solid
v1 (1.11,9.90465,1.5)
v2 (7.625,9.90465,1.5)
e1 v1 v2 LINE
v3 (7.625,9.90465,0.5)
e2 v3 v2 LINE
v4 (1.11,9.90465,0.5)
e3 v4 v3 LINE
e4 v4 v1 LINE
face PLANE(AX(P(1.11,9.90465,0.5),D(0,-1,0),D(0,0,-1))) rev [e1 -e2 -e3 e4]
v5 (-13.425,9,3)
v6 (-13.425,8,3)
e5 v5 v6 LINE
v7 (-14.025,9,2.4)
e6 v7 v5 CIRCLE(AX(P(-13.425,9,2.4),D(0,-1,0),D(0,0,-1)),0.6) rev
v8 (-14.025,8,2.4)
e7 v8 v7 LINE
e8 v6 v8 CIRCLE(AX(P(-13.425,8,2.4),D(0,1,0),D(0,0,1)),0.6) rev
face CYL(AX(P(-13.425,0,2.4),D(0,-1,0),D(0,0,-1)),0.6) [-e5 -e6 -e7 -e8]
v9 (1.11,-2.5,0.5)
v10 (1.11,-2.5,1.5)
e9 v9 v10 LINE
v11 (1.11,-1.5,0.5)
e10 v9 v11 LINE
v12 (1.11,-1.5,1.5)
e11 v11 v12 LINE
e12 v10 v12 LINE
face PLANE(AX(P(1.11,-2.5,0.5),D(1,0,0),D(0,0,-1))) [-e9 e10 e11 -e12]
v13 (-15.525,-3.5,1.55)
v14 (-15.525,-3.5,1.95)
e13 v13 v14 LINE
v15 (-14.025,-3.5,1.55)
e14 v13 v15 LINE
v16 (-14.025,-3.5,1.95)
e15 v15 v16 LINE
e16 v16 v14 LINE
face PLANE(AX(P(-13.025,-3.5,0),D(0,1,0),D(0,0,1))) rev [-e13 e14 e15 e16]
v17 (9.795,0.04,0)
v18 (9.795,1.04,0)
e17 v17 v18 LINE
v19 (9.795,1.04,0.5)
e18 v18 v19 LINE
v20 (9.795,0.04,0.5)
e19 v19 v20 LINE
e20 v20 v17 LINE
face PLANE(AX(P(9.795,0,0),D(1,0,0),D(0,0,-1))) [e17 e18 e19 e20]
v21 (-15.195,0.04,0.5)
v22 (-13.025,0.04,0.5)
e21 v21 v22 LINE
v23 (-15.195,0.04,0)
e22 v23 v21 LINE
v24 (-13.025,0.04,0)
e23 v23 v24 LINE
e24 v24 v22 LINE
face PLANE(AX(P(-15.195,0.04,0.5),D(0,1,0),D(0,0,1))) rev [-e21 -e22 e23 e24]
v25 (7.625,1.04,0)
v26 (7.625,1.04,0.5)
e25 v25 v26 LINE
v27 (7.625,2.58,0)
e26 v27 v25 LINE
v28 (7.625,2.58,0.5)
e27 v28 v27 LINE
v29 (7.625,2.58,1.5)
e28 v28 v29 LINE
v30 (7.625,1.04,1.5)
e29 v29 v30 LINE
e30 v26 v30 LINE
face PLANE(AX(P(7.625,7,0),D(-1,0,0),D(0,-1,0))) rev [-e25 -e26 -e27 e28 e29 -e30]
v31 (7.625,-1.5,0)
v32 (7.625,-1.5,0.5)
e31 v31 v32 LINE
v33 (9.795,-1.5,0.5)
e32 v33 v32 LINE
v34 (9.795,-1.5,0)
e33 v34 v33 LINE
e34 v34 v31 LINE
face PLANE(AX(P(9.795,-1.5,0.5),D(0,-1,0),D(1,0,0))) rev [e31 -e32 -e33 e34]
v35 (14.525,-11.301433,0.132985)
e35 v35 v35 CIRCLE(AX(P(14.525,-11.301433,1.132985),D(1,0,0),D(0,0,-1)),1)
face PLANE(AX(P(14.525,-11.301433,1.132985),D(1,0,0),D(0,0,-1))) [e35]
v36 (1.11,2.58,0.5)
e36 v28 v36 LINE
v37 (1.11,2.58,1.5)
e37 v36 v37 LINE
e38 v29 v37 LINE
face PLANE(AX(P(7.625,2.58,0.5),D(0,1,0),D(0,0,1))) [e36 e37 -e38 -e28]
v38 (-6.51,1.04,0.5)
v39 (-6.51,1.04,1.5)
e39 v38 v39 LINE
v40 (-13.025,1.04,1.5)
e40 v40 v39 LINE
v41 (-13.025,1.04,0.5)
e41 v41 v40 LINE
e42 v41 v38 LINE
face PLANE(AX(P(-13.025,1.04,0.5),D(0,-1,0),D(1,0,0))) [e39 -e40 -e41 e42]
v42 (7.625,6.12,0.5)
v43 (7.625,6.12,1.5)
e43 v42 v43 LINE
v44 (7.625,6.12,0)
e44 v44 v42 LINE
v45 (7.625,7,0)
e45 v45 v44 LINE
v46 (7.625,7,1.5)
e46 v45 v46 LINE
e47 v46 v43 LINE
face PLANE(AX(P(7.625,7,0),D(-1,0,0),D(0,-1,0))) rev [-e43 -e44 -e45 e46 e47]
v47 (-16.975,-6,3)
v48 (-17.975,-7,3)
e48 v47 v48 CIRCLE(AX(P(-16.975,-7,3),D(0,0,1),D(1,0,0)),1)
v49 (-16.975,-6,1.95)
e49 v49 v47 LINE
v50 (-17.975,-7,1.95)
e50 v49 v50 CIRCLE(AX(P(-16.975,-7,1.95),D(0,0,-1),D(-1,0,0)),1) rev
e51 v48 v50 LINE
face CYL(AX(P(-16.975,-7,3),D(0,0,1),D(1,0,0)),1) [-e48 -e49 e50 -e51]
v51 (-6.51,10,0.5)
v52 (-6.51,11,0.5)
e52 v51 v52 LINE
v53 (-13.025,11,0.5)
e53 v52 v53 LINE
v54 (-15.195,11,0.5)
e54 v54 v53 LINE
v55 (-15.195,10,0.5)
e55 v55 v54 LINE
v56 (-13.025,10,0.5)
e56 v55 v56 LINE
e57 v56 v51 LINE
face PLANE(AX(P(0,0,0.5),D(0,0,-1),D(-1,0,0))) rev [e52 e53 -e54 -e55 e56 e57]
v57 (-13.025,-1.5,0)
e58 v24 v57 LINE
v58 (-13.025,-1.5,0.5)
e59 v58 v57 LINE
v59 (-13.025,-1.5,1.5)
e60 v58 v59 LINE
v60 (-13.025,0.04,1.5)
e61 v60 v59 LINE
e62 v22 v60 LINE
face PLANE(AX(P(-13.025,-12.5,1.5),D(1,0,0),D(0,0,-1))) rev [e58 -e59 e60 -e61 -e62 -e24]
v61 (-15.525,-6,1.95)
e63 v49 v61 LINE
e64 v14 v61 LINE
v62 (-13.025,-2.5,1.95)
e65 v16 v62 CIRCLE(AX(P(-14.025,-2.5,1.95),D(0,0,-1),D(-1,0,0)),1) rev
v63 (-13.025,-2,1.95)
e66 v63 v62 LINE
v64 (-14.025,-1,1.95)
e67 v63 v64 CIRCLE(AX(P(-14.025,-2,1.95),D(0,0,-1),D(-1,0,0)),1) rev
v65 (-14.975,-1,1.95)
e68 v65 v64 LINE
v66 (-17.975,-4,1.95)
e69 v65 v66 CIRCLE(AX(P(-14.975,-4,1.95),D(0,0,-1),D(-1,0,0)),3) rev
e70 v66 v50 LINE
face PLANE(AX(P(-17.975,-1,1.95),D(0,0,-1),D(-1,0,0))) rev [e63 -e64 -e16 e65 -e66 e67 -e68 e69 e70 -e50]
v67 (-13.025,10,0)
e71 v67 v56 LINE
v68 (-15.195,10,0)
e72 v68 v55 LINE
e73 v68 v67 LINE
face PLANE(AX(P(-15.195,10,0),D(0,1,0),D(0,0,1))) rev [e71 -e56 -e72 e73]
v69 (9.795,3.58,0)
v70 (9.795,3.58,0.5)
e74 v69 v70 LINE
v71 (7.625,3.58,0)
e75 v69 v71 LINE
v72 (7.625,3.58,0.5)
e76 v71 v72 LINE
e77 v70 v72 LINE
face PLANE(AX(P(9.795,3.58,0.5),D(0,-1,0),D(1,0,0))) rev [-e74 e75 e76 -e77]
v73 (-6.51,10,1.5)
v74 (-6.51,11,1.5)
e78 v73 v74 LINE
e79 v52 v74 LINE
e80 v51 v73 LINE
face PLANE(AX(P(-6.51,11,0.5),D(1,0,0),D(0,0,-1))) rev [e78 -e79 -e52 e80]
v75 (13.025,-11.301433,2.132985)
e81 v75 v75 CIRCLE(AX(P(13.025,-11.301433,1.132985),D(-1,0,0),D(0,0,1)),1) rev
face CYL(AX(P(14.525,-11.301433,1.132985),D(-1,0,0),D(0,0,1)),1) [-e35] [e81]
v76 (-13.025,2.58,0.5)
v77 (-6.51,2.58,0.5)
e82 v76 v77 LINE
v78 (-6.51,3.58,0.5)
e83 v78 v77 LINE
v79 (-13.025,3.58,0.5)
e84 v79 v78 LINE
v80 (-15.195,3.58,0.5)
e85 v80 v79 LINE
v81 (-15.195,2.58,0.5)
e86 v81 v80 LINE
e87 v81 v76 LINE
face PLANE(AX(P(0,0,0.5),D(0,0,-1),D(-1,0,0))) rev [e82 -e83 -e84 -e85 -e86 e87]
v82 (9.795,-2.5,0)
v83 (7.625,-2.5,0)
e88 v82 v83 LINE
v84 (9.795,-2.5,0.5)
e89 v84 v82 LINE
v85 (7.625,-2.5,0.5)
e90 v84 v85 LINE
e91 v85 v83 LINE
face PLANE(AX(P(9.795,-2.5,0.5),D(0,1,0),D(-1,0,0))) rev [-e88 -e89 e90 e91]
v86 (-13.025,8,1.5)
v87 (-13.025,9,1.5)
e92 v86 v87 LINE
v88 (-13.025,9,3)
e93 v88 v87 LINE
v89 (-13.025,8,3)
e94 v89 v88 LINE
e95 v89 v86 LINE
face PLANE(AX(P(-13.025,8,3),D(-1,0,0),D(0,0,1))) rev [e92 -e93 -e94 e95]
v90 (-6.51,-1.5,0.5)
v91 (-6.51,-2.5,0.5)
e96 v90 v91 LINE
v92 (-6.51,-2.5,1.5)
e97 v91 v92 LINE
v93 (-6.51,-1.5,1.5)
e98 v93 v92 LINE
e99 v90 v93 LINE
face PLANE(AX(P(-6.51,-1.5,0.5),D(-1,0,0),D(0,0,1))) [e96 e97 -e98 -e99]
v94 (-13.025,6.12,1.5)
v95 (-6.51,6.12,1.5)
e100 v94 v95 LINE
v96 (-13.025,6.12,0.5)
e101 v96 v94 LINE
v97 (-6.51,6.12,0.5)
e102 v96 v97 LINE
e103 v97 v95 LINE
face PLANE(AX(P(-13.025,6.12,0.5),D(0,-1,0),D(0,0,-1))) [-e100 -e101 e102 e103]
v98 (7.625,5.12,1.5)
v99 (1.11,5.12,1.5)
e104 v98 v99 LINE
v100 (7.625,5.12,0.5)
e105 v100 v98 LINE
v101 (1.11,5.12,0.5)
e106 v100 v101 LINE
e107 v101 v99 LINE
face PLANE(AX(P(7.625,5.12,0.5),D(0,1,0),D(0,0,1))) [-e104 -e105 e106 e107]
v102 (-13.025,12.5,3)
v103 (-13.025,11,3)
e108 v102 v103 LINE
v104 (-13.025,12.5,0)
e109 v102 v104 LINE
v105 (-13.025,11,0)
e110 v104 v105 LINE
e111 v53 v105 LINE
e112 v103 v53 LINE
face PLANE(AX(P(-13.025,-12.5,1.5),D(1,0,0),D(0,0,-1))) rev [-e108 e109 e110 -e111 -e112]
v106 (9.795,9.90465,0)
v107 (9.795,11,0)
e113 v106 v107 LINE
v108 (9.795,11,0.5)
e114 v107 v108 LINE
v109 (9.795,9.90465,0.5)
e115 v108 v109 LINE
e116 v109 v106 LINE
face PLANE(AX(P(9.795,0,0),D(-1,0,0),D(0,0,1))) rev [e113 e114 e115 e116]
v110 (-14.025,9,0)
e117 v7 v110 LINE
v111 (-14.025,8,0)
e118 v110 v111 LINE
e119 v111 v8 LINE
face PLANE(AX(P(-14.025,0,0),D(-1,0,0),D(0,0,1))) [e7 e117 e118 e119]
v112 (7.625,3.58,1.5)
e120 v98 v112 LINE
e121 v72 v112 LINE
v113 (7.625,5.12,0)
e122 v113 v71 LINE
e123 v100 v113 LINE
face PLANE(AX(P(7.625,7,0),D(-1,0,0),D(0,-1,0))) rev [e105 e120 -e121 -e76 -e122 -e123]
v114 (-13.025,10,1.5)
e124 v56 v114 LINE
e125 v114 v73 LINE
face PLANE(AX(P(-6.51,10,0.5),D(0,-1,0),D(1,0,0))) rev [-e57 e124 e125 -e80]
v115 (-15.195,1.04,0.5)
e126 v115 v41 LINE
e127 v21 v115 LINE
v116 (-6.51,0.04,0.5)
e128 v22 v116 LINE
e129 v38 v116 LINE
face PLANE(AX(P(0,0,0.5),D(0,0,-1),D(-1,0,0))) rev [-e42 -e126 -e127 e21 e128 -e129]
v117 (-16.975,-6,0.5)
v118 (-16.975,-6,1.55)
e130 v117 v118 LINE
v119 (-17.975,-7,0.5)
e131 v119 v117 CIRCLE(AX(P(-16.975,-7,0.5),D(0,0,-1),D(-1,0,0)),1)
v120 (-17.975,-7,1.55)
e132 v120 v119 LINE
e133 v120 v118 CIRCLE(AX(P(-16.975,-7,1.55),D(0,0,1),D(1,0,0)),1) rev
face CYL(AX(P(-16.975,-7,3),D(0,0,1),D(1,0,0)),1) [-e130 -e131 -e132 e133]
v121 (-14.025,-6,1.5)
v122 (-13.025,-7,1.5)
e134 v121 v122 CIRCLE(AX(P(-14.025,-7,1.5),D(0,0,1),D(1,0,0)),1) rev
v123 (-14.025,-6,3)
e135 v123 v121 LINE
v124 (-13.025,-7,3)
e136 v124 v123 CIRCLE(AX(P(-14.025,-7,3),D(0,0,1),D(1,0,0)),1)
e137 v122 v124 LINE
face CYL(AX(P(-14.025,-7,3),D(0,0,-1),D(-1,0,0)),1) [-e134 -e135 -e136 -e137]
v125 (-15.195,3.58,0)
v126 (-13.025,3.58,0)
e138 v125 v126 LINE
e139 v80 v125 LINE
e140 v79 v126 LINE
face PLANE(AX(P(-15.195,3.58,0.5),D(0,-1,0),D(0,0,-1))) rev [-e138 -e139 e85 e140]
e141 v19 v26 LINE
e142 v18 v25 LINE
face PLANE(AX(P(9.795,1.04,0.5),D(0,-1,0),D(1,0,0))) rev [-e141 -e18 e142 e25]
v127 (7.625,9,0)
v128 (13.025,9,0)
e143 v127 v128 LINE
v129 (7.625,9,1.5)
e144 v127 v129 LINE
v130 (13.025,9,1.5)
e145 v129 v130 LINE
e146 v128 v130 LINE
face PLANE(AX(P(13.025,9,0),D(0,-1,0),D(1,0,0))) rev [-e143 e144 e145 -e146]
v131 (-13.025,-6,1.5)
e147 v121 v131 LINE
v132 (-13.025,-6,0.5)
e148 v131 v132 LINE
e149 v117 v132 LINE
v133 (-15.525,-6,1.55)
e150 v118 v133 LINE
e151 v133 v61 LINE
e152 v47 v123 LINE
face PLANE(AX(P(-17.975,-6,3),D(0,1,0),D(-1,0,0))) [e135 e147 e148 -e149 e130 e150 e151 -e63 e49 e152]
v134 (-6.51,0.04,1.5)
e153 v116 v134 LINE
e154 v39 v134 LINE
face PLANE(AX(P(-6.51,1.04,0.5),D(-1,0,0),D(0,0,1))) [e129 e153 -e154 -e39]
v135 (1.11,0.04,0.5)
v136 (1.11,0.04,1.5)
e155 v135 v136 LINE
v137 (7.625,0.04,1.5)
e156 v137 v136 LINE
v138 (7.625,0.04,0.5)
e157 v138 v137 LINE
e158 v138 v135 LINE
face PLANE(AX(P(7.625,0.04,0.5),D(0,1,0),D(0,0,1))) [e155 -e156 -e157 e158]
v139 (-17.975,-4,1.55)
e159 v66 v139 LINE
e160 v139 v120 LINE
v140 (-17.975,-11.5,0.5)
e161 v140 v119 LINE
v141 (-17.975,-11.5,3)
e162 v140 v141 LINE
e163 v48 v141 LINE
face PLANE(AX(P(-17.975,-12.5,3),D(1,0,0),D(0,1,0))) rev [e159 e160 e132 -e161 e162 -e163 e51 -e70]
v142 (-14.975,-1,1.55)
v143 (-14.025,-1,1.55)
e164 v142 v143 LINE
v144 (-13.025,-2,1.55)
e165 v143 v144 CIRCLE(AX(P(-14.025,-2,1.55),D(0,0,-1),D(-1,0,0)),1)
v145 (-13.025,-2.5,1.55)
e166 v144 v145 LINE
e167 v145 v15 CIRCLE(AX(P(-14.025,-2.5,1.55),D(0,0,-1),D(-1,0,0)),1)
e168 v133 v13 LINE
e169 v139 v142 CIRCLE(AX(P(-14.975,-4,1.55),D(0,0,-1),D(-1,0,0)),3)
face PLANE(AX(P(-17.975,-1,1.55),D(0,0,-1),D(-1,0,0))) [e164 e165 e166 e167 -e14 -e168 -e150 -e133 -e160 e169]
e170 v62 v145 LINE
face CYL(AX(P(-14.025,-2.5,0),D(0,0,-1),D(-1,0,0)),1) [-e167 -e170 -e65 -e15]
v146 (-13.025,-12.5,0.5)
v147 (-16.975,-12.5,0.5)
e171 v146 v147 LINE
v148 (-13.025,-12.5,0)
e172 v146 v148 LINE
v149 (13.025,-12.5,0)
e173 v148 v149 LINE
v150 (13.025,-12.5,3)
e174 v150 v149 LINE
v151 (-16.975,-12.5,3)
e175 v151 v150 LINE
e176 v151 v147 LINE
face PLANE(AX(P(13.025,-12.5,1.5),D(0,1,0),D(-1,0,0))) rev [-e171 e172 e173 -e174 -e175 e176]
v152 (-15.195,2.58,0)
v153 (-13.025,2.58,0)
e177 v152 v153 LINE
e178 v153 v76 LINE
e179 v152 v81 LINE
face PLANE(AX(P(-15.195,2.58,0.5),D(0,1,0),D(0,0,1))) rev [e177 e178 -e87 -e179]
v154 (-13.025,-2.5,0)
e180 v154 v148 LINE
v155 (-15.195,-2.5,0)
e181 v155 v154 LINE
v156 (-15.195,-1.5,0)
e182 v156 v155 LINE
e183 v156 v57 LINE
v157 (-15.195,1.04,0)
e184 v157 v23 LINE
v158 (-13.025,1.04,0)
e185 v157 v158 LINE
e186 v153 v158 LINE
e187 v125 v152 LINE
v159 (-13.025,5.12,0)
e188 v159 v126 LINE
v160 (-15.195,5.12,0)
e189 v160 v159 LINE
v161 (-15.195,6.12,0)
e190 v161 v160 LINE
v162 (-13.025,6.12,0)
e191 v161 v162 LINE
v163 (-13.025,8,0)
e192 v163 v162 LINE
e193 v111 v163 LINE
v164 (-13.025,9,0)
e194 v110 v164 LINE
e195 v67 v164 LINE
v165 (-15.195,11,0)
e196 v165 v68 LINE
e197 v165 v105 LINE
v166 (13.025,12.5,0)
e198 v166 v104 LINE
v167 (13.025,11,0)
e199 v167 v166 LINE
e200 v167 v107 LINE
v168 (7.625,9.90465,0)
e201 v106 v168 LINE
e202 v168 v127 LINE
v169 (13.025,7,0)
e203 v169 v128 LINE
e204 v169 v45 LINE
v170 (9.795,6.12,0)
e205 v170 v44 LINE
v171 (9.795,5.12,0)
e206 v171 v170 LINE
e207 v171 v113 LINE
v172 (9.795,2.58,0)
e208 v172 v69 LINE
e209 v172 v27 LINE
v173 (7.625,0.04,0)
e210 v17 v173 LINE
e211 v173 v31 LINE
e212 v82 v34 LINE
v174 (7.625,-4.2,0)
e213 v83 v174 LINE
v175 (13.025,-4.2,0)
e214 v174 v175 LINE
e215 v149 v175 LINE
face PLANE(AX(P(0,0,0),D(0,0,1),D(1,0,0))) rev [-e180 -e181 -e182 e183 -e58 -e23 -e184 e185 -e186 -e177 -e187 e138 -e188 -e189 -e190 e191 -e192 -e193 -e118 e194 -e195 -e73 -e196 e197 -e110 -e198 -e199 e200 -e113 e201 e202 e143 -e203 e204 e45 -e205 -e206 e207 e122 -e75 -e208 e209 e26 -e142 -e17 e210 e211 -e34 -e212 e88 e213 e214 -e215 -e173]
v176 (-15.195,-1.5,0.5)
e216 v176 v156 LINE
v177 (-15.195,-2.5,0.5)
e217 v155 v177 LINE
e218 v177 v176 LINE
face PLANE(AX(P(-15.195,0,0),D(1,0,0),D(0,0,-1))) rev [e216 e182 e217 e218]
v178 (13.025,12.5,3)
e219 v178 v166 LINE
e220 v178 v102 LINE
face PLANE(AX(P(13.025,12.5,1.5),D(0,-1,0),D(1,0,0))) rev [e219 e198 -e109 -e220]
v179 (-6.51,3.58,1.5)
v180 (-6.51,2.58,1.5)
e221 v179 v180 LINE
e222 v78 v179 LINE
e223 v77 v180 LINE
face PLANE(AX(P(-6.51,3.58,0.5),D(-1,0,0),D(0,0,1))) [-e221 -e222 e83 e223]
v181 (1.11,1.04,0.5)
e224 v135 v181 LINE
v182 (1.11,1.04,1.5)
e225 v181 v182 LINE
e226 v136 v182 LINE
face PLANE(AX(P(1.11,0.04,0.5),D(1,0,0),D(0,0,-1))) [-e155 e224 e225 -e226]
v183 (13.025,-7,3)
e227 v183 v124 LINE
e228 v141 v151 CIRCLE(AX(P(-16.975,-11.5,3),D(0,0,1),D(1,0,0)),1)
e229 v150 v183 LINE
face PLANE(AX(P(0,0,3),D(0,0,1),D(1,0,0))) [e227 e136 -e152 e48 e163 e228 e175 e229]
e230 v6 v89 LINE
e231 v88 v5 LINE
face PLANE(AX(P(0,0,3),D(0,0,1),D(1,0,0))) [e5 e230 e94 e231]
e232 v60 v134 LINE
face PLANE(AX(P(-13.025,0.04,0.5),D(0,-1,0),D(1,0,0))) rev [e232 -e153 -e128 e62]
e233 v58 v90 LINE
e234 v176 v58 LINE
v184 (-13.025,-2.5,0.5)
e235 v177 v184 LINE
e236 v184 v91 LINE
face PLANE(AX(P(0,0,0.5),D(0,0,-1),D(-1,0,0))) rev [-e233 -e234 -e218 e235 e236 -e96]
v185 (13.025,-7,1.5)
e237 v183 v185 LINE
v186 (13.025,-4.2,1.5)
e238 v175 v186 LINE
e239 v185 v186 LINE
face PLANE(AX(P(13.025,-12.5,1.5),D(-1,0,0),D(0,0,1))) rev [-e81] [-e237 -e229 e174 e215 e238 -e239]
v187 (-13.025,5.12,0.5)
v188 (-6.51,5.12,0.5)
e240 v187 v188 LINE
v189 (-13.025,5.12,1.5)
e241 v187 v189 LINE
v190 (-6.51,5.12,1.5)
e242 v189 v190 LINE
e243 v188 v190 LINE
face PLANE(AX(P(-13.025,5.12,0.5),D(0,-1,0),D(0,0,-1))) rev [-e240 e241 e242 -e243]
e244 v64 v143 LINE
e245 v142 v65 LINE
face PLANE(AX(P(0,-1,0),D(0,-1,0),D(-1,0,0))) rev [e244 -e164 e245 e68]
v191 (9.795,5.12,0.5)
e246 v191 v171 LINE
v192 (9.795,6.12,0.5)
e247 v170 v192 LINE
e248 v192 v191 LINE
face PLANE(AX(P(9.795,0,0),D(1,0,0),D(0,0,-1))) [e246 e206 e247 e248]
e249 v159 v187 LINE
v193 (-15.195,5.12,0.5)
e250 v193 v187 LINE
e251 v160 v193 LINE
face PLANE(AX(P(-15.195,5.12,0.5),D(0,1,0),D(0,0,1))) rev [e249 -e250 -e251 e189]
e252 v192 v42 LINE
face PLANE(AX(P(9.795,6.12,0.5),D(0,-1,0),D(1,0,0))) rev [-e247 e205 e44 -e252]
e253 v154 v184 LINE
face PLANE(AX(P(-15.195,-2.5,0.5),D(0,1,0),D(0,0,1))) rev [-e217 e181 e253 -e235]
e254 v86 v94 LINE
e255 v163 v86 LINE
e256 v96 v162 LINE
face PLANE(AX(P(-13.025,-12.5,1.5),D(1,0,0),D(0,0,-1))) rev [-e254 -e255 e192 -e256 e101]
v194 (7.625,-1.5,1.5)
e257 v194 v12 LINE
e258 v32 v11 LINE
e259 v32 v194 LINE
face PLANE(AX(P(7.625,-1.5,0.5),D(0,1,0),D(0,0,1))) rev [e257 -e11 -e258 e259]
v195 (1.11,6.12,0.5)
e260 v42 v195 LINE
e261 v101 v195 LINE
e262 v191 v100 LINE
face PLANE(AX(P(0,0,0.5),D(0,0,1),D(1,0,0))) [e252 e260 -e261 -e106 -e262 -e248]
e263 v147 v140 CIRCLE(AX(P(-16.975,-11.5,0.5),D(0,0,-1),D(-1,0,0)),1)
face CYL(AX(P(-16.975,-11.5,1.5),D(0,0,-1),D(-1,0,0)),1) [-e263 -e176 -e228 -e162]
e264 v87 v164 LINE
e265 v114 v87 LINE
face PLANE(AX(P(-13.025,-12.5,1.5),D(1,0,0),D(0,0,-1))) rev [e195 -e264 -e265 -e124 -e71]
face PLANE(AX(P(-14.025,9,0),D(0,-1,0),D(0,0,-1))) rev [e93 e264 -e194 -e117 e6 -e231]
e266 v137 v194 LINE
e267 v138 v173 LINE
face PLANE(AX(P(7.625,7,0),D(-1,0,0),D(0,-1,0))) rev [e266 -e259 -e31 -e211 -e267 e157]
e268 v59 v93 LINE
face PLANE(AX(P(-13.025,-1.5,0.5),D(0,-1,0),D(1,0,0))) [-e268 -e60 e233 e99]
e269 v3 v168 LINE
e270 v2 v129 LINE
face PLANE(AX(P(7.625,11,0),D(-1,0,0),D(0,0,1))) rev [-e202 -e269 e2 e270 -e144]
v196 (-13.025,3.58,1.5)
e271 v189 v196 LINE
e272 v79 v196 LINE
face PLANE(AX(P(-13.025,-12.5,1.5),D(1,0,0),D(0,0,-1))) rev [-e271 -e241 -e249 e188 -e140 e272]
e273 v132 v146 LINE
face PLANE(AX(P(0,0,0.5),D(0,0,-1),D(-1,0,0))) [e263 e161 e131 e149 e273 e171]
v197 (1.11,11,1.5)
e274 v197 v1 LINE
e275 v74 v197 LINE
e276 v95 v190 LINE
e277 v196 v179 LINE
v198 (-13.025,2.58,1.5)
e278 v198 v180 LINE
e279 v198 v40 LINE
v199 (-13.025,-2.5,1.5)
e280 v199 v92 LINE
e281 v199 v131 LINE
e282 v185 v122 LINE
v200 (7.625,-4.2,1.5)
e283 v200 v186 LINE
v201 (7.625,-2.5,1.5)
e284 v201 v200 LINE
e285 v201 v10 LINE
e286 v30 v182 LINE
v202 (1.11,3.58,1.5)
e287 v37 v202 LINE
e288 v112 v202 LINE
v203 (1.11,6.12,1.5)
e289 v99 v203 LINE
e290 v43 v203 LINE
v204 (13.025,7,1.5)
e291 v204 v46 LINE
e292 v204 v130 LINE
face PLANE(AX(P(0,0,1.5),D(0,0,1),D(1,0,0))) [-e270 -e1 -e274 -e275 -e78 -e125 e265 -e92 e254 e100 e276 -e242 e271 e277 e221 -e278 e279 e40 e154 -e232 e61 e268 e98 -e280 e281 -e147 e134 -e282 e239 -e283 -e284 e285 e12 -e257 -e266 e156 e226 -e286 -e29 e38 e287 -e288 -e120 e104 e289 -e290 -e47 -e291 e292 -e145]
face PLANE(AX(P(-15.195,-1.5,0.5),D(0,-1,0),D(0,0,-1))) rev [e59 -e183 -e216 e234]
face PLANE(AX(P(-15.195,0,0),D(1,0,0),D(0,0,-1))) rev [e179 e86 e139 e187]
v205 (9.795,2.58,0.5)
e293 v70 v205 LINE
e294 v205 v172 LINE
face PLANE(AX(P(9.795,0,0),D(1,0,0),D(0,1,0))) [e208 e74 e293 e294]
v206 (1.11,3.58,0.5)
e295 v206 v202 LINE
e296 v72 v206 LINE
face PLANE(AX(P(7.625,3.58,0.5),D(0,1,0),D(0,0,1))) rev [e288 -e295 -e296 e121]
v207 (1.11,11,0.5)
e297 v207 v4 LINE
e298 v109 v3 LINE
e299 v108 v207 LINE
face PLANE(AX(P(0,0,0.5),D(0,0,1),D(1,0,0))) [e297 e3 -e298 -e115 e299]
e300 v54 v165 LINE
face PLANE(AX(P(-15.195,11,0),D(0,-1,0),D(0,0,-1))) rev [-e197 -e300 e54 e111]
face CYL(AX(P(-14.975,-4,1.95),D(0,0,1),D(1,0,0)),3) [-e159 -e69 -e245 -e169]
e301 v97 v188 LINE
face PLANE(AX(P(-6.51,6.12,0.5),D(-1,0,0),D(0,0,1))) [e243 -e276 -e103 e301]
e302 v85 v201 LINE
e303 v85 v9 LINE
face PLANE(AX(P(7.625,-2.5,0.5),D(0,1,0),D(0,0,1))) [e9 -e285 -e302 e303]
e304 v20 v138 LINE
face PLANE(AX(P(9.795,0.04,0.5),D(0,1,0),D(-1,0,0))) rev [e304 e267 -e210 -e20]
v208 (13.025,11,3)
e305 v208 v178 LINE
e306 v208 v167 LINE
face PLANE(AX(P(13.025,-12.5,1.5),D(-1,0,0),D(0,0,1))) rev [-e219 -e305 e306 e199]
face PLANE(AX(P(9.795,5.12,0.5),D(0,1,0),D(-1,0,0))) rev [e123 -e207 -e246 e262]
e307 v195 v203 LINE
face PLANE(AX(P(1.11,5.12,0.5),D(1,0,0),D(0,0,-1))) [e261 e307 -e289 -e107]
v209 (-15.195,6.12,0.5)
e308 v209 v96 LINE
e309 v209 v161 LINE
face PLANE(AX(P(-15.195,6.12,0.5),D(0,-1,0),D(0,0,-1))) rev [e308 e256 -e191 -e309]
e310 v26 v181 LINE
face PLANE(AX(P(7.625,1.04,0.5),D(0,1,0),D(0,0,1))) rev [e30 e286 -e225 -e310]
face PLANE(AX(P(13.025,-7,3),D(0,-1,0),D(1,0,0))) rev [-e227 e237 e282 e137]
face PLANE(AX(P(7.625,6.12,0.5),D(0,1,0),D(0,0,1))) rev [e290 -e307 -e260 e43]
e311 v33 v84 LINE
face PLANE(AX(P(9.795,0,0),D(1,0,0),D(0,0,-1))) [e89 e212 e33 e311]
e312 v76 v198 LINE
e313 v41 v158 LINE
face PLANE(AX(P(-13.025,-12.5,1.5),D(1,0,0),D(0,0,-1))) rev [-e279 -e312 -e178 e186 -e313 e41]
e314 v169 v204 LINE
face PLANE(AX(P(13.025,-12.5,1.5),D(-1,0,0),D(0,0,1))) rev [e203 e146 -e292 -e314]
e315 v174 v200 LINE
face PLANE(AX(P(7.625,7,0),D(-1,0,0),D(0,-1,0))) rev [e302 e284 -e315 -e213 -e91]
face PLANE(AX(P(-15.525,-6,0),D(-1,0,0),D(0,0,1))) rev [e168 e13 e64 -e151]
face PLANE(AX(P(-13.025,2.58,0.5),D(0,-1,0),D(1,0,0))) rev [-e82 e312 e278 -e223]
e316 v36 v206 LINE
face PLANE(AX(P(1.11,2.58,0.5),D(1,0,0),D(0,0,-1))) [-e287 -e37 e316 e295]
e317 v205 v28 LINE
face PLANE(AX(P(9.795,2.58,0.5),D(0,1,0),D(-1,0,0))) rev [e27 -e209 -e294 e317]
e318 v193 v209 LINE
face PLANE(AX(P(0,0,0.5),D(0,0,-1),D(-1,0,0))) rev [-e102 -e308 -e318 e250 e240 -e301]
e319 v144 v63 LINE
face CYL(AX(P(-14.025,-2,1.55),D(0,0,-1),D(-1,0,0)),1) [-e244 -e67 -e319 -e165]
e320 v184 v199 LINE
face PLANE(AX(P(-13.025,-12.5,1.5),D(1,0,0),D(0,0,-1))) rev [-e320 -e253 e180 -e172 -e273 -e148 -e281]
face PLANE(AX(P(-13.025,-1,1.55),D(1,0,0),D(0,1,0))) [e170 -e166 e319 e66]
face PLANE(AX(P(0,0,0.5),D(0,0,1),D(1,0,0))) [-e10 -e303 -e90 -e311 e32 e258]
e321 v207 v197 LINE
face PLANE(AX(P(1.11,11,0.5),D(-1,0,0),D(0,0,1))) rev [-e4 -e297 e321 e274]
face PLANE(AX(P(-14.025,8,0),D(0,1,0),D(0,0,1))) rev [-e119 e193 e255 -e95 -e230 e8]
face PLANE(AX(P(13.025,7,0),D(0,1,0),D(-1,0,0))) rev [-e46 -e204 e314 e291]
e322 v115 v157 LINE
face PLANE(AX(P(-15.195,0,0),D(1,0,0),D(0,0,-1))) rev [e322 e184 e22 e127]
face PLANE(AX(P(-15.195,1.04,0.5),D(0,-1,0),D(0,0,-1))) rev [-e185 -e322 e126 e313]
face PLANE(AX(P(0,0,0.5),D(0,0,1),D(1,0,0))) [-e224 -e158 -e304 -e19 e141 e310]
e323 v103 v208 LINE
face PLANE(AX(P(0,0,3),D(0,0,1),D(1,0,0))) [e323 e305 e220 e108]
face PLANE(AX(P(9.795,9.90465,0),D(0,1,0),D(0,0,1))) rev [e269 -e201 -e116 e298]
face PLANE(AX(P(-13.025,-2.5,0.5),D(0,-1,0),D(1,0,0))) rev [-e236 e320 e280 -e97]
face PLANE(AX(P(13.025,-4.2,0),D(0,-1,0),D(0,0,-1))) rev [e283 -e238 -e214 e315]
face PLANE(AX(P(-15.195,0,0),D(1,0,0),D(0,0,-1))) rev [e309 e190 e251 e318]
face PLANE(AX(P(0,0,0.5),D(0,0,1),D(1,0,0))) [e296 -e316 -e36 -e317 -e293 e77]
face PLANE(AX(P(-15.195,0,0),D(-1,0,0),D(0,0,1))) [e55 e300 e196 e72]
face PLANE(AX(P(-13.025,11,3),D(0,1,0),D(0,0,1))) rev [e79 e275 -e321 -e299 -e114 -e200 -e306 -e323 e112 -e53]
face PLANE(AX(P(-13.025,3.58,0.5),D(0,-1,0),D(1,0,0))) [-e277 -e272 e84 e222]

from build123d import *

# Parameters (mm, degrees)
SKETCH_1_W            = 26.05
SKETCH_1_H            = 25
EXTRUDE_1_DEPTH       = 1.5
SKETCH_3_W            = 5.4
SKETCH_3_H            = 11.2
CUT_EXTRUDE_1_DEPTH   = 19.114928236
SKETCH_4_W            = 26.05
SKETCH_4_H            = 1.5
EXTRUDE_2_DEPTH       = 1.5
SKETCH_5_W            = 5.4
SKETCH_5_H            = 2
CUT_EXTRUDE_2_DEPTH   = 19.114928236
SKETCH_6_W            = 31
SKETCH_6_H            = 5.5
EXTRUDE_3_DEPTH       = 1.5
SKETCH_7_R            = 1
EXTRUDE_4_DEPTH       = 1.5
EXTRUDE_13_DEPTH      = 1
EXTRUDE_13_DEPTH_BACK = 1.5
SKETCH_10_W           = 4.95
SKETCH_10_H           = 6.5
FILLET_1_R            = 1
SKETCH_11_W           = 4.95
SKETCH_11_H           = 0.4
EXTRUDE_1_2_DEPTH     = 5
SKETCH_12_W           = 2.5
SKETCH_12_H           = 2.5
CUT_EXTRUDE_3_DEPTH   = 22.980744414
FILLET_2_R            = 3
FILLET_3_R            = 1
SKETCH_13_W           = 1
SKETCH_13_H           = 0.4
EXTRUDE_14_DEPTH      = 4
SKETCH_15_W           = 1.5
SKETCH_15_H           = 1
EXTRUDE_15_DEPTH      = 1
SKETCH_16_W           = 1
SKETCH_16_H           = 1
EXTRUDE_16_DEPTH      = 1.5
SKETCH_17_W           = 6.515
SKETCH_17_H           = 1
CUT_EXTRUDE_1_2_DEPTH = 1
SKETCH_18_W           = 0.5
SKETCH_18_H           = 1
EXTRUDE_17_DEPTH      = 2.17
SKETCH_20_W           = 0.5
SKETCH_20_H           = 1
EXTRUDE_18_DEPTH      = 2.17
SKETCH_21_W           = 6.515
SKETCH_21_H           = 1
SKETCH_21_H_2         = 1.095349757
CUT_EXTRUDE_4_DEPTH   = 1
SKETCH_22_W           = 0.5
SKETCH_22_H           = 1
EXTRUDE_19_DEPTH      = 2.17
SKETCH_23_W           = 0.5
SKETCH_23_H           = 1.095349757
EXTRUDE_20_DEPTH      = 2.17
FILLET_4_R            = 0.6


with BuildPart() as part:
    # Эскиз1 → Extrude 1 (new body)
    with BuildSketch(Plane.XY):
        Rectangle(SKETCH_1_W, SKETCH_1_H)
    extrude(amount=EXTRUDE_1_DEPTH)

    # Эскиз3 → Cut-Extrude 1 (cut, through all)
    with BuildSketch(Plane.XY.offset(1.5)):
        with Locations((10.325, 1.4)):
            Rectangle(SKETCH_3_W, SKETCH_3_H)
    extrude(amount=-CUT_EXTRUDE_1_DEPTH, mode=Mode.SUBTRACT)

    # Эскиз4 → Бобышка-Вытянуть2 (add)
    with BuildSketch(Plane.XY.offset(1.5)):
        with Locations((0, 11.75)):
            Rectangle(SKETCH_4_W, SKETCH_4_H)
    extrude(amount=EXTRUDE_2_DEPTH)

    # Эскиз5 → Вырез-Вытянуть2 (cut, through all)
    with BuildSketch(Plane.XY.offset(1.5)):
        with Locations((10.325, 10)):
            Rectangle(SKETCH_5_W, SKETCH_5_H)
    extrude(amount=-CUT_EXTRUDE_2_DEPTH, mode=Mode.SUBTRACT)

    # Эскиз6 → Бобышка-Вытянуть3 (add)
    with BuildSketch(Plane.XY.offset(1.5)):
        with Locations((-2.475, -9.75)):
            Rectangle(SKETCH_6_W, SKETCH_6_H)
    extrude(amount=EXTRUDE_3_DEPTH)

    # Эскиз7 → Бобышка-Вытянуть4 (add)
    with BuildSketch(Plane(origin=(13.025, 0, 0), x_dir=(0, 0, -1), z_dir=(1, 0, 0))):
        with Locations(Location((-1.132985358, -11.301432667, 0), (0, 0, 180))):
            Circle(SKETCH_7_R)
    extrude(amount=EXTRUDE_4_DEPTH)

    # Эскиз10 → Бобышка-Вытянуть13 (add, two sides: drawn at the far end of the back side and taken through both)
    with BuildSketch(Plane(origin=(0, 0, 1.5), x_dir=(-1, 0, 0), z_dir=(0, 0, -1)).offset(-EXTRUDE_13_DEPTH_BACK)):
        with Locations((15.5, -9.25)):
            Rectangle(SKETCH_10_W, SKETCH_10_H)
    extrude(amount=EXTRUDE_13_DEPTH + EXTRUDE_13_DEPTH_BACK)

    # Скругление1
    fillet_1_edges = [part.edges().sort_by_distance(p)[0] for p in [
        (-17.975, -12.5, 1.75),
        (-17.975, -6, 1.75),
        (-13.025, -6, 2.25),
    ]]
    fillet(fillet_1_edges, radius=FILLET_1_R - 0.0001)  # a hair under: the kernel refuses the full size

    # Эскиз11 → Extrude 1 2 (add)
    with BuildSketch(Plane(origin=(0, -6, 0), x_dir=(1, 0, 0), z_dir=(0, 1, 0))):
        with Locations((-15.5, -1.75)):
            Rectangle(SKETCH_11_W, SKETCH_11_H)
    extrude(amount=EXTRUDE_1_2_DEPTH)

    # Эскиз12 → Вырез-Вытянуть3 (cut, through all)
    with BuildSketch(Plane.XY.offset(1.95)):
        with Locations((-14.275, -4.75)):
            Rectangle(SKETCH_12_W, SKETCH_12_H)
    extrude(amount=-CUT_EXTRUDE_3_DEPTH, mode=Mode.SUBTRACT)

    # Скругление2
    fillet_2_edges = [part.edges().sort_by_distance(p)[0] for p in [
        (-17.975, -1, 1.75),
    ]]
    fillet(fillet_2_edges, radius=FILLET_2_R)

    # Скругление3
    fillet_3_edges = [part.edges().sort_by_distance(p)[0] for p in [
        (-13.025, -1, 1.75),
        (-13.025, -3.5, 1.75),
    ]]
    fillet(fillet_3_edges, radius=FILLET_3_R)

    # Эскиз13 → Бобышка-Вытянуть14 (add)
    with BuildSketch(Plane.XZ.offset(6)):
        with Locations((-17.475, 1.75)):
            Rectangle(SKETCH_13_W, SKETCH_13_H)
    extrude(amount=EXTRUDE_14_DEPTH)

    # Эскиз15 → Бобышка-Вытянуть15 (add)
    with BuildSketch(Plane.ZY.offset(13.025)):
        with Locations((0.75, 8.5)):
            Rectangle(SKETCH_15_W, SKETCH_15_H)
    extrude(amount=EXTRUDE_15_DEPTH)

    # Эскиз16 → Бобышка-Вытянуть16 (add)
    with BuildSketch(Plane.XY.offset(1.5)):
        with Locations((-13.525, 8.5)):
            Rectangle(SKETCH_16_W, SKETCH_16_H)
    extrude(amount=EXTRUDE_16_DEPTH)

    # Эскиз17 → Cut-Extrude 1 2 (cut)
    with BuildSketch(Plane.XY.offset(1.5)):
        with Locations((-9.7675, -2)):
            Rectangle(SKETCH_17_W, SKETCH_17_H)
        with Locations((4.3675, -2)):
            Rectangle(SKETCH_17_W, SKETCH_17_H)
        with Locations((-9.7675, 0.54)):
            Rectangle(SKETCH_17_W, SKETCH_17_H)
        with Locations((4.3675, 0.54)):
            Rectangle(SKETCH_17_W, SKETCH_17_H)
        with Locations((-9.7675, 3.08)):
            Rectangle(SKETCH_17_W, SKETCH_17_H)
        with Locations((4.3675, 3.08)):
            Rectangle(SKETCH_17_W, SKETCH_17_H)
        with Locations((-9.7675, 5.62)):
            Rectangle(SKETCH_17_W, SKETCH_17_H)
        with Locations((4.3675, 5.62)):
            Rectangle(SKETCH_17_W, SKETCH_17_H)
    extrude(amount=-CUT_EXTRUDE_1_2_DEPTH, mode=Mode.SUBTRACT)

    # Эскиз18 → Бобышка-Вытянуть17 (add)
    with BuildSketch(Plane(origin=(7.625, 0, 0), x_dir=(0, 0, -1), z_dir=(1, 0, 0))):
        with Locations((-0.25, 3.08)):
            Rectangle(SKETCH_18_W, SKETCH_18_H)
        with Locations((-0.25, 5.62)):
            Rectangle(SKETCH_18_W, SKETCH_18_H)
        with Locations((-0.25, 0.54)):
            Rectangle(SKETCH_18_W, SKETCH_18_H)
        with Locations((-0.25, -2)):
            Rectangle(SKETCH_18_W, SKETCH_18_H)
    extrude(amount=EXTRUDE_17_DEPTH)

    # Эскиз20 → Бобышка-Вытянуть18 (add)
    with BuildSketch(Plane.ZY.offset(13.025)):
        with Locations((0.25, 3.08)):
            Rectangle(SKETCH_20_W, SKETCH_20_H)
        with Locations((0.25, 5.62)):
            Rectangle(SKETCH_20_W, SKETCH_20_H)
        with Locations((0.25, 0.54)):
            Rectangle(SKETCH_20_W, SKETCH_20_H)
        with Locations((0.25, -2)):
            Rectangle(SKETCH_20_W, SKETCH_20_H)
    extrude(amount=EXTRUDE_18_DEPTH)

    # Эскиз21 → Вырез-Вытянуть4 (cut)
    with BuildSketch(Plane.XY.offset(1.5)):
        with Locations((-9.7675, 10.5)):
            Rectangle(SKETCH_21_W, SKETCH_21_H)
        with Locations((4.3675, 10.452325121)):
            Rectangle(SKETCH_21_W, SKETCH_21_H_2)
    extrude(amount=-CUT_EXTRUDE_4_DEPTH, mode=Mode.SUBTRACT)

    # Эскиз22 → Бобышка-Вытянуть19 (add)
    with BuildSketch(Plane.ZY.offset(13.025)):
        with Locations((0.25, 10.5)):
            Rectangle(SKETCH_22_W, SKETCH_22_H)
    extrude(amount=EXTRUDE_19_DEPTH)

    # Эскиз23 → Бобышка-Вытянуть20 (add)
    with BuildSketch(Plane(origin=(7.625, 0, 0), x_dir=(0, 0, -1), z_dir=(1, 0, 0))):
        with Locations((-0.25, 10.452325121)):
            Rectangle(SKETCH_23_W, SKETCH_23_H)
    extrude(amount=EXTRUDE_20_DEPTH)

    # Скругление4
    fillet_4_edges = [part.edges().sort_by_distance(p)[0] for p in [
        (-14.025, 8.5, 3),
    ]]
    fillet(fillet_4_edges, radius=FILLET_4_R)


solid = part.part
